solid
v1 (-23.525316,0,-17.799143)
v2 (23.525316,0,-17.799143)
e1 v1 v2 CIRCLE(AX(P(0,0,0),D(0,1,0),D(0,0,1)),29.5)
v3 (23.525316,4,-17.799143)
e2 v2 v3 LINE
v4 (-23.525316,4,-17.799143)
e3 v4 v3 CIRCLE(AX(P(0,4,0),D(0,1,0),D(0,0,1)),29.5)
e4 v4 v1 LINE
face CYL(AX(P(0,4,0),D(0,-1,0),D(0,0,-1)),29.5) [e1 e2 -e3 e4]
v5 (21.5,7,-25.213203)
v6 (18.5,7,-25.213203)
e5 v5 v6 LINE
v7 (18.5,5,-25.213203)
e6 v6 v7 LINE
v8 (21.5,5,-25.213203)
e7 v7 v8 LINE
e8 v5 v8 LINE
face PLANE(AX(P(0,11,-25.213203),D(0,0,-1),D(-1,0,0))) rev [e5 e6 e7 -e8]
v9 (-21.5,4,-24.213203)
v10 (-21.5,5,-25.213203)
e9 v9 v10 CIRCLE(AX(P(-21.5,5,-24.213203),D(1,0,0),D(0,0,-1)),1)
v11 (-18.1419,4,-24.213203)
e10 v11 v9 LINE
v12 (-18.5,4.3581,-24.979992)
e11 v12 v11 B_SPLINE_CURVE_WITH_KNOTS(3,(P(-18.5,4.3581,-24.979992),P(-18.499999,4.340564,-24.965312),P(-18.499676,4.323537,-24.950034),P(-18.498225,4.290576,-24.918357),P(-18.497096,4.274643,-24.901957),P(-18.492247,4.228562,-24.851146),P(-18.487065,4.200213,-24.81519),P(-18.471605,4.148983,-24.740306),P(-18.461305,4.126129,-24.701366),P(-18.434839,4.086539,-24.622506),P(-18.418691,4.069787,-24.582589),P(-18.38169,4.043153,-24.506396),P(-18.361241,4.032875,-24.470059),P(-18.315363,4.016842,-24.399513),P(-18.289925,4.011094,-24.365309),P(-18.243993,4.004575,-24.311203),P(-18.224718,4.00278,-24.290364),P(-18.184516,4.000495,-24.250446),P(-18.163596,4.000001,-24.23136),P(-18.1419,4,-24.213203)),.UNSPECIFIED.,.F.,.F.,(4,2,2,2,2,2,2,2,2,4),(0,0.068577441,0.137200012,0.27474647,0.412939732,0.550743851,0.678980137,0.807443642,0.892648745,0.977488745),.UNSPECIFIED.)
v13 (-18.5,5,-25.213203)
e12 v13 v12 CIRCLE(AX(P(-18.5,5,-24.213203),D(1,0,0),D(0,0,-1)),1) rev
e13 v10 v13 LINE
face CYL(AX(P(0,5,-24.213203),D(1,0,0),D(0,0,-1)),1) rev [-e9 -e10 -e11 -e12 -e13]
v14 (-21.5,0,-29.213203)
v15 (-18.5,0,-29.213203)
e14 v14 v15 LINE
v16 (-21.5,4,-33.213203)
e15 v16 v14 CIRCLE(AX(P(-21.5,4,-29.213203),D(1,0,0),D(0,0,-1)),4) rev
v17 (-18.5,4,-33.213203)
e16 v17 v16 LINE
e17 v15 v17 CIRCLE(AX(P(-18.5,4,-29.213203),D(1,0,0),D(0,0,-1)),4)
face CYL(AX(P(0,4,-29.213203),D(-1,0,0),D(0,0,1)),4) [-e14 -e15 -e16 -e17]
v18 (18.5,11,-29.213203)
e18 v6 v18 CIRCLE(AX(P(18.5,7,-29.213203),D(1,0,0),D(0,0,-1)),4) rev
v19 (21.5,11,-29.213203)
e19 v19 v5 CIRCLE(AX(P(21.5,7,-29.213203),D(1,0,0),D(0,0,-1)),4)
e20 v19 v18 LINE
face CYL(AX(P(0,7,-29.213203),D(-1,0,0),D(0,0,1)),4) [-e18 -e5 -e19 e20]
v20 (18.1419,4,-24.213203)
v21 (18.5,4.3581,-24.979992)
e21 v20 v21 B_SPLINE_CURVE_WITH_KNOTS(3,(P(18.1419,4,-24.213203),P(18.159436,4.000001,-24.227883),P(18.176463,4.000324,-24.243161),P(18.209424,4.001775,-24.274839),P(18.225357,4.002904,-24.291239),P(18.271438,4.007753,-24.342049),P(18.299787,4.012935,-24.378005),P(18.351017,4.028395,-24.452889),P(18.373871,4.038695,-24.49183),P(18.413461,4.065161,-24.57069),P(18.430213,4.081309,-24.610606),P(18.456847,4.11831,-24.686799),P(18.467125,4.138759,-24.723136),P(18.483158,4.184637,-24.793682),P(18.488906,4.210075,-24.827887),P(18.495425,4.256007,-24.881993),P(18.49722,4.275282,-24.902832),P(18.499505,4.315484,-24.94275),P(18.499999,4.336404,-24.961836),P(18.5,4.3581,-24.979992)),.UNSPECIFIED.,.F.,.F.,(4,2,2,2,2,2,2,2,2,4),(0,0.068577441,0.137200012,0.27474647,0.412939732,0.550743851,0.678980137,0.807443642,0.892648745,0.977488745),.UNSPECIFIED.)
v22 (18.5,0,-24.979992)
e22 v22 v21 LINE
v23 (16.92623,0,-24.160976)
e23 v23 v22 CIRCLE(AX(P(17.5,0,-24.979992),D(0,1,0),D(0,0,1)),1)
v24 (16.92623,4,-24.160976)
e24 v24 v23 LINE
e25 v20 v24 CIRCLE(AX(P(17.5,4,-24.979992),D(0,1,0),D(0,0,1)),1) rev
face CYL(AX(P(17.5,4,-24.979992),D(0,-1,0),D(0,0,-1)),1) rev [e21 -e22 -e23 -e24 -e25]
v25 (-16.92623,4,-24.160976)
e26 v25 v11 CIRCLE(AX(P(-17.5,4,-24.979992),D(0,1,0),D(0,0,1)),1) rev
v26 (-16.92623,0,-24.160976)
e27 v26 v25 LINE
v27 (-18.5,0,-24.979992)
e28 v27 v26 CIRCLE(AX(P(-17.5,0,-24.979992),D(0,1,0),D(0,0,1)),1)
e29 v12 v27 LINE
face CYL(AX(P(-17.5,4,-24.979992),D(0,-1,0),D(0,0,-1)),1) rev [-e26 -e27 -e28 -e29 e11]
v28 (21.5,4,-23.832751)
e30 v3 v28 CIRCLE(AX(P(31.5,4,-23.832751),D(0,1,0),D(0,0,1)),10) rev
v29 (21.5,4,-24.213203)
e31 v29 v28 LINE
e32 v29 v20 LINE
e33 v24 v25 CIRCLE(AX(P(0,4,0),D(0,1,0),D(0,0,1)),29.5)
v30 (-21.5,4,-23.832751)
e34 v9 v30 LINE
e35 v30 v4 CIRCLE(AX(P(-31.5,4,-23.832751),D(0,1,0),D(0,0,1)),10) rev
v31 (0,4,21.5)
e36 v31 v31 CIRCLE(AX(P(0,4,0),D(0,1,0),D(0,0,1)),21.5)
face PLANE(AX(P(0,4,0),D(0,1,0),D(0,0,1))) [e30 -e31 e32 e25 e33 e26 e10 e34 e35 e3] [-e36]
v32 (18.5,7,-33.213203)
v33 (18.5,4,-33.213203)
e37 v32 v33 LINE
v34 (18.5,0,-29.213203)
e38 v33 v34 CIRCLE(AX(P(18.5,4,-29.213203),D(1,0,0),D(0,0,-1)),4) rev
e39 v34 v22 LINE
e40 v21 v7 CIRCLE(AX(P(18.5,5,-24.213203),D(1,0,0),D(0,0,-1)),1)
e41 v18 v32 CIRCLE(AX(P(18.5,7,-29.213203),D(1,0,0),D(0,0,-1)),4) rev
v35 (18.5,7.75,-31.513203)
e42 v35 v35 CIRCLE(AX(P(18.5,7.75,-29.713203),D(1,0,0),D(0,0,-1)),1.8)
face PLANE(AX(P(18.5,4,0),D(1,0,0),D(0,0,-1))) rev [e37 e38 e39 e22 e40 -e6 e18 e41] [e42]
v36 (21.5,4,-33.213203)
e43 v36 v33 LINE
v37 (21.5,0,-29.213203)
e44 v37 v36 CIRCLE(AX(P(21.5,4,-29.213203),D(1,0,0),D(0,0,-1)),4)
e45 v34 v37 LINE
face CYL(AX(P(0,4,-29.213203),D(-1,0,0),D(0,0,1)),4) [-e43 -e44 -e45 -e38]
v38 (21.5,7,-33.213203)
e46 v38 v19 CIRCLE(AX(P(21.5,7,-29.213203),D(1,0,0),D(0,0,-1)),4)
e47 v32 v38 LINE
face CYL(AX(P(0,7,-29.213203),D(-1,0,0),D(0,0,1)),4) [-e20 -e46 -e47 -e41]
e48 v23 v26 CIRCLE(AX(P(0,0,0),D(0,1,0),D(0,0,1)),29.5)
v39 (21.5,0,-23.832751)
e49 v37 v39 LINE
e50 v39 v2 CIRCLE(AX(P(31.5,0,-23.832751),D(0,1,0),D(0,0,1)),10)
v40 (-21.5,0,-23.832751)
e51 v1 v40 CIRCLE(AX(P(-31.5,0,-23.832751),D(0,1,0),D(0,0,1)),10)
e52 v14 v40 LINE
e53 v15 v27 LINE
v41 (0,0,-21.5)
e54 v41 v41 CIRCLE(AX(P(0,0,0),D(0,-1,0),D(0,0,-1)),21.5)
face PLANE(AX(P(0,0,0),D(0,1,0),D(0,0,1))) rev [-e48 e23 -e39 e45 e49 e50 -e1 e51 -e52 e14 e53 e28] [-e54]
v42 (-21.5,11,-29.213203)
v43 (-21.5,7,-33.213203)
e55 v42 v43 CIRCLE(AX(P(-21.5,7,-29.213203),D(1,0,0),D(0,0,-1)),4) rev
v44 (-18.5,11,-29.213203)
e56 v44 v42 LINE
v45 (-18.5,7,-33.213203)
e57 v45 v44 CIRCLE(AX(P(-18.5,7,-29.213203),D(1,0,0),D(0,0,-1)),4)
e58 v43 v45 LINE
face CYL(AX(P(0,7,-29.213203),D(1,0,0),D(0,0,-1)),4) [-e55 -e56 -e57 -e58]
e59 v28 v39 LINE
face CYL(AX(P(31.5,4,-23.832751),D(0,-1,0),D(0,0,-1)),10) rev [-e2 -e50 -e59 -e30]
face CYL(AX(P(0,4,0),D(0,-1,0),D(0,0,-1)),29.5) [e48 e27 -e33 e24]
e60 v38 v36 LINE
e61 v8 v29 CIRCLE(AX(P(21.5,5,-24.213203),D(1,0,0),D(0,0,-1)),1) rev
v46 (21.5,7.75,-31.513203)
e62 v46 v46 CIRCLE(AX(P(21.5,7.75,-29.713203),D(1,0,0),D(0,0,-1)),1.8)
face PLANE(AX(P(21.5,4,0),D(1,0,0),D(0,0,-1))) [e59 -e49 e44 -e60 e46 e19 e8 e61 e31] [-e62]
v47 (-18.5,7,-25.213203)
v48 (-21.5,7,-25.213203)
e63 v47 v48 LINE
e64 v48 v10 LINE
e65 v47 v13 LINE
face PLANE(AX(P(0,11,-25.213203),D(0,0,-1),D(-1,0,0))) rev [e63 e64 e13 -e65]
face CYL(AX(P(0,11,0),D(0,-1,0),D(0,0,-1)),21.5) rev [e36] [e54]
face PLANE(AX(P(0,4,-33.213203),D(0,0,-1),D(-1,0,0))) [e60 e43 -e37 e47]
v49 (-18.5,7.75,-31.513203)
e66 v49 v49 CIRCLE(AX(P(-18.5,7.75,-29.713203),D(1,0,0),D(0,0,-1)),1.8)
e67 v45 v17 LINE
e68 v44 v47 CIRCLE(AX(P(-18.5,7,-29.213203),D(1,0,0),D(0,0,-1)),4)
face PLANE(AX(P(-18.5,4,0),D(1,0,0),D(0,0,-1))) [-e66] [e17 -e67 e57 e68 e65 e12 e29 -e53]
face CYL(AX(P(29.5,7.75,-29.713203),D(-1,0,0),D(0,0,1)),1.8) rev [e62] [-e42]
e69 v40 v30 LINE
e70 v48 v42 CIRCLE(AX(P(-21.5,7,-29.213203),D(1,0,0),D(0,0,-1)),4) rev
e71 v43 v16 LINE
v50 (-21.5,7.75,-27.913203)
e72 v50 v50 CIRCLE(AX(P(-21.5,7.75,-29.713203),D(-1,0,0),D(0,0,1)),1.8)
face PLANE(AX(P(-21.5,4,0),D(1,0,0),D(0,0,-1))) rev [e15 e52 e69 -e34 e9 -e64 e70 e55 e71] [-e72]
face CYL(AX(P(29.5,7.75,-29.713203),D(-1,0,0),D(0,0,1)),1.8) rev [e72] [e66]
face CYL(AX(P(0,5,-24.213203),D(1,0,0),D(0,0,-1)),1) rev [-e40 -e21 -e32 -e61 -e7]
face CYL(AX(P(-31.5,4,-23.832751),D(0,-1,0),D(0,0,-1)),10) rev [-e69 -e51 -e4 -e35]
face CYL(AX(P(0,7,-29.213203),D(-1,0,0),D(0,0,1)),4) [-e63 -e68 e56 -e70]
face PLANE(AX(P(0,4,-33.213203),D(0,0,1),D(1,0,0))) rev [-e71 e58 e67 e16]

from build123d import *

# Parameters (mm, degrees)
BOSS_EXTRUDE1_DEPTH = 4
SKETCH2_W           = 3
SKETCH2_H           = 8
BOSS_EXTRUDE2_DEPTH = 7
SKETCH3_R           = 1.8
CUT_EXTRUDE1_DEPTH  = 62.847529316
FILLET1_R           = 4
FILLET2_R           = 10
FILLET3_R           = 1
FILLET4_R           = 1
SKETCH4_R           = 21.5
CUT_EXTRUDE2_DEPTH  = 46.764253326


with BuildPart() as part:
    # Sketch1 → Boss-Extrude1 (new body)
    with BuildSketch(Plane(origin=(0, 0, 0), x_dir=(1, 0, 0), z_dir=(0, 1, 0))):
        with BuildLine():
            Line((18.5, 33.213203436), (18.5, 22.978250586))
            ThreePointArc((18.5, 22.978250586), (0, 29.5), (-18.5, 22.978250586))
            Line((-18.5, 22.978250586), (-18.5, 33.213203436))
            Line((-18.5, 33.213203436), (-21.5, 33.213203436))
            Line((-21.5, 33.213203436), (-21.5, 20.199009877))
            ThreePointArc((-21.5, 20.199009877), (0, -29.5), (21.5, 20.199009877))
            Line((21.5, 20.199009877), (21.5, 33.213203436))
            Line((21.5, 33.213203436), (18.5, 33.213203436))
        make_face()
    extrude(amount=BOSS_EXTRUDE1_DEPTH)

    # Sketch2 → Boss-Extrude2 (add)
    with BuildSketch(Plane(origin=(0, 4, 0), x_dir=(1, 0, 0), z_dir=(0, 1, 0))):
        with Locations((-20, 29.213203436)):
            Rectangle(SKETCH2_W, SKETCH2_H)
        with Locations((20, 29.213203436)):
            Rectangle(SKETCH2_W, SKETCH2_H)
    extrude(amount=BOSS_EXTRUDE2_DEPTH)

    # Sketch3 → Cut-Extrude1 (cut, through all)
    with BuildSketch(Plane.ZY.offset(21.5)):
        with Locations(Location((-29.713203436, 7.75, 0), (0, 0, 180))):
            Circle(SKETCH3_R)
    extrude(amount=-CUT_EXTRUDE1_DEPTH, mode=Mode.SUBTRACT)

    # Fillet1
    fillet1_edges = [part.edges().sort_by_distance(p)[0] for p in [
        (-20, 11, -25.213203436),
        (-20, 11, -33.213203436),
        (20, 11, -25.213203436),
        (20, 11, -33.213203436),
        (20, 0, -33.213203436),
        (-20, 0, -33.213203436),
    ]]
    fillet(fillet1_edges, radius=FILLET1_R - 0.0001)  # a hair under: the kernel refuses the full size

    # Fillet2
    fillet2_edges = [part.edges().sort_by_distance(p)[0] for p in [
        (21.5, 2, -20.199009877),
        (-21.5, 2, -20.199009877),
    ]]
    fillet(fillet2_edges, radius=FILLET2_R)

    # Fillet3
    fillet3_edges = [part.edges().sort_by_distance(p)[0] for p in [
        (18.5, 2, -22.978250586),
        (-18.5, 2, -22.978250586),
    ]]
    fillet(fillet3_edges, radius=FILLET3_R)

    # Fillet4
    fillet4_edges = [part.edges().sort_by_distance(p)[0] for p in [
        (-20, 4, -25.213203436),
        (20, 4, -25.213203436),
    ]]
    fillet(fillet4_edges, radius=FILLET4_R)

    # Sketch4 → Cut-Extrude2 (cut, through all)
    with BuildSketch(Plane.XZ):
        with Locations(Location((0, 0, 0), (0, 0, 270))):
            Circle(SKETCH4_R)
    extrude(amount=-CUT_EXTRUDE2_DEPTH, mode=Mode.SUBTRACT)


solid = part.part
